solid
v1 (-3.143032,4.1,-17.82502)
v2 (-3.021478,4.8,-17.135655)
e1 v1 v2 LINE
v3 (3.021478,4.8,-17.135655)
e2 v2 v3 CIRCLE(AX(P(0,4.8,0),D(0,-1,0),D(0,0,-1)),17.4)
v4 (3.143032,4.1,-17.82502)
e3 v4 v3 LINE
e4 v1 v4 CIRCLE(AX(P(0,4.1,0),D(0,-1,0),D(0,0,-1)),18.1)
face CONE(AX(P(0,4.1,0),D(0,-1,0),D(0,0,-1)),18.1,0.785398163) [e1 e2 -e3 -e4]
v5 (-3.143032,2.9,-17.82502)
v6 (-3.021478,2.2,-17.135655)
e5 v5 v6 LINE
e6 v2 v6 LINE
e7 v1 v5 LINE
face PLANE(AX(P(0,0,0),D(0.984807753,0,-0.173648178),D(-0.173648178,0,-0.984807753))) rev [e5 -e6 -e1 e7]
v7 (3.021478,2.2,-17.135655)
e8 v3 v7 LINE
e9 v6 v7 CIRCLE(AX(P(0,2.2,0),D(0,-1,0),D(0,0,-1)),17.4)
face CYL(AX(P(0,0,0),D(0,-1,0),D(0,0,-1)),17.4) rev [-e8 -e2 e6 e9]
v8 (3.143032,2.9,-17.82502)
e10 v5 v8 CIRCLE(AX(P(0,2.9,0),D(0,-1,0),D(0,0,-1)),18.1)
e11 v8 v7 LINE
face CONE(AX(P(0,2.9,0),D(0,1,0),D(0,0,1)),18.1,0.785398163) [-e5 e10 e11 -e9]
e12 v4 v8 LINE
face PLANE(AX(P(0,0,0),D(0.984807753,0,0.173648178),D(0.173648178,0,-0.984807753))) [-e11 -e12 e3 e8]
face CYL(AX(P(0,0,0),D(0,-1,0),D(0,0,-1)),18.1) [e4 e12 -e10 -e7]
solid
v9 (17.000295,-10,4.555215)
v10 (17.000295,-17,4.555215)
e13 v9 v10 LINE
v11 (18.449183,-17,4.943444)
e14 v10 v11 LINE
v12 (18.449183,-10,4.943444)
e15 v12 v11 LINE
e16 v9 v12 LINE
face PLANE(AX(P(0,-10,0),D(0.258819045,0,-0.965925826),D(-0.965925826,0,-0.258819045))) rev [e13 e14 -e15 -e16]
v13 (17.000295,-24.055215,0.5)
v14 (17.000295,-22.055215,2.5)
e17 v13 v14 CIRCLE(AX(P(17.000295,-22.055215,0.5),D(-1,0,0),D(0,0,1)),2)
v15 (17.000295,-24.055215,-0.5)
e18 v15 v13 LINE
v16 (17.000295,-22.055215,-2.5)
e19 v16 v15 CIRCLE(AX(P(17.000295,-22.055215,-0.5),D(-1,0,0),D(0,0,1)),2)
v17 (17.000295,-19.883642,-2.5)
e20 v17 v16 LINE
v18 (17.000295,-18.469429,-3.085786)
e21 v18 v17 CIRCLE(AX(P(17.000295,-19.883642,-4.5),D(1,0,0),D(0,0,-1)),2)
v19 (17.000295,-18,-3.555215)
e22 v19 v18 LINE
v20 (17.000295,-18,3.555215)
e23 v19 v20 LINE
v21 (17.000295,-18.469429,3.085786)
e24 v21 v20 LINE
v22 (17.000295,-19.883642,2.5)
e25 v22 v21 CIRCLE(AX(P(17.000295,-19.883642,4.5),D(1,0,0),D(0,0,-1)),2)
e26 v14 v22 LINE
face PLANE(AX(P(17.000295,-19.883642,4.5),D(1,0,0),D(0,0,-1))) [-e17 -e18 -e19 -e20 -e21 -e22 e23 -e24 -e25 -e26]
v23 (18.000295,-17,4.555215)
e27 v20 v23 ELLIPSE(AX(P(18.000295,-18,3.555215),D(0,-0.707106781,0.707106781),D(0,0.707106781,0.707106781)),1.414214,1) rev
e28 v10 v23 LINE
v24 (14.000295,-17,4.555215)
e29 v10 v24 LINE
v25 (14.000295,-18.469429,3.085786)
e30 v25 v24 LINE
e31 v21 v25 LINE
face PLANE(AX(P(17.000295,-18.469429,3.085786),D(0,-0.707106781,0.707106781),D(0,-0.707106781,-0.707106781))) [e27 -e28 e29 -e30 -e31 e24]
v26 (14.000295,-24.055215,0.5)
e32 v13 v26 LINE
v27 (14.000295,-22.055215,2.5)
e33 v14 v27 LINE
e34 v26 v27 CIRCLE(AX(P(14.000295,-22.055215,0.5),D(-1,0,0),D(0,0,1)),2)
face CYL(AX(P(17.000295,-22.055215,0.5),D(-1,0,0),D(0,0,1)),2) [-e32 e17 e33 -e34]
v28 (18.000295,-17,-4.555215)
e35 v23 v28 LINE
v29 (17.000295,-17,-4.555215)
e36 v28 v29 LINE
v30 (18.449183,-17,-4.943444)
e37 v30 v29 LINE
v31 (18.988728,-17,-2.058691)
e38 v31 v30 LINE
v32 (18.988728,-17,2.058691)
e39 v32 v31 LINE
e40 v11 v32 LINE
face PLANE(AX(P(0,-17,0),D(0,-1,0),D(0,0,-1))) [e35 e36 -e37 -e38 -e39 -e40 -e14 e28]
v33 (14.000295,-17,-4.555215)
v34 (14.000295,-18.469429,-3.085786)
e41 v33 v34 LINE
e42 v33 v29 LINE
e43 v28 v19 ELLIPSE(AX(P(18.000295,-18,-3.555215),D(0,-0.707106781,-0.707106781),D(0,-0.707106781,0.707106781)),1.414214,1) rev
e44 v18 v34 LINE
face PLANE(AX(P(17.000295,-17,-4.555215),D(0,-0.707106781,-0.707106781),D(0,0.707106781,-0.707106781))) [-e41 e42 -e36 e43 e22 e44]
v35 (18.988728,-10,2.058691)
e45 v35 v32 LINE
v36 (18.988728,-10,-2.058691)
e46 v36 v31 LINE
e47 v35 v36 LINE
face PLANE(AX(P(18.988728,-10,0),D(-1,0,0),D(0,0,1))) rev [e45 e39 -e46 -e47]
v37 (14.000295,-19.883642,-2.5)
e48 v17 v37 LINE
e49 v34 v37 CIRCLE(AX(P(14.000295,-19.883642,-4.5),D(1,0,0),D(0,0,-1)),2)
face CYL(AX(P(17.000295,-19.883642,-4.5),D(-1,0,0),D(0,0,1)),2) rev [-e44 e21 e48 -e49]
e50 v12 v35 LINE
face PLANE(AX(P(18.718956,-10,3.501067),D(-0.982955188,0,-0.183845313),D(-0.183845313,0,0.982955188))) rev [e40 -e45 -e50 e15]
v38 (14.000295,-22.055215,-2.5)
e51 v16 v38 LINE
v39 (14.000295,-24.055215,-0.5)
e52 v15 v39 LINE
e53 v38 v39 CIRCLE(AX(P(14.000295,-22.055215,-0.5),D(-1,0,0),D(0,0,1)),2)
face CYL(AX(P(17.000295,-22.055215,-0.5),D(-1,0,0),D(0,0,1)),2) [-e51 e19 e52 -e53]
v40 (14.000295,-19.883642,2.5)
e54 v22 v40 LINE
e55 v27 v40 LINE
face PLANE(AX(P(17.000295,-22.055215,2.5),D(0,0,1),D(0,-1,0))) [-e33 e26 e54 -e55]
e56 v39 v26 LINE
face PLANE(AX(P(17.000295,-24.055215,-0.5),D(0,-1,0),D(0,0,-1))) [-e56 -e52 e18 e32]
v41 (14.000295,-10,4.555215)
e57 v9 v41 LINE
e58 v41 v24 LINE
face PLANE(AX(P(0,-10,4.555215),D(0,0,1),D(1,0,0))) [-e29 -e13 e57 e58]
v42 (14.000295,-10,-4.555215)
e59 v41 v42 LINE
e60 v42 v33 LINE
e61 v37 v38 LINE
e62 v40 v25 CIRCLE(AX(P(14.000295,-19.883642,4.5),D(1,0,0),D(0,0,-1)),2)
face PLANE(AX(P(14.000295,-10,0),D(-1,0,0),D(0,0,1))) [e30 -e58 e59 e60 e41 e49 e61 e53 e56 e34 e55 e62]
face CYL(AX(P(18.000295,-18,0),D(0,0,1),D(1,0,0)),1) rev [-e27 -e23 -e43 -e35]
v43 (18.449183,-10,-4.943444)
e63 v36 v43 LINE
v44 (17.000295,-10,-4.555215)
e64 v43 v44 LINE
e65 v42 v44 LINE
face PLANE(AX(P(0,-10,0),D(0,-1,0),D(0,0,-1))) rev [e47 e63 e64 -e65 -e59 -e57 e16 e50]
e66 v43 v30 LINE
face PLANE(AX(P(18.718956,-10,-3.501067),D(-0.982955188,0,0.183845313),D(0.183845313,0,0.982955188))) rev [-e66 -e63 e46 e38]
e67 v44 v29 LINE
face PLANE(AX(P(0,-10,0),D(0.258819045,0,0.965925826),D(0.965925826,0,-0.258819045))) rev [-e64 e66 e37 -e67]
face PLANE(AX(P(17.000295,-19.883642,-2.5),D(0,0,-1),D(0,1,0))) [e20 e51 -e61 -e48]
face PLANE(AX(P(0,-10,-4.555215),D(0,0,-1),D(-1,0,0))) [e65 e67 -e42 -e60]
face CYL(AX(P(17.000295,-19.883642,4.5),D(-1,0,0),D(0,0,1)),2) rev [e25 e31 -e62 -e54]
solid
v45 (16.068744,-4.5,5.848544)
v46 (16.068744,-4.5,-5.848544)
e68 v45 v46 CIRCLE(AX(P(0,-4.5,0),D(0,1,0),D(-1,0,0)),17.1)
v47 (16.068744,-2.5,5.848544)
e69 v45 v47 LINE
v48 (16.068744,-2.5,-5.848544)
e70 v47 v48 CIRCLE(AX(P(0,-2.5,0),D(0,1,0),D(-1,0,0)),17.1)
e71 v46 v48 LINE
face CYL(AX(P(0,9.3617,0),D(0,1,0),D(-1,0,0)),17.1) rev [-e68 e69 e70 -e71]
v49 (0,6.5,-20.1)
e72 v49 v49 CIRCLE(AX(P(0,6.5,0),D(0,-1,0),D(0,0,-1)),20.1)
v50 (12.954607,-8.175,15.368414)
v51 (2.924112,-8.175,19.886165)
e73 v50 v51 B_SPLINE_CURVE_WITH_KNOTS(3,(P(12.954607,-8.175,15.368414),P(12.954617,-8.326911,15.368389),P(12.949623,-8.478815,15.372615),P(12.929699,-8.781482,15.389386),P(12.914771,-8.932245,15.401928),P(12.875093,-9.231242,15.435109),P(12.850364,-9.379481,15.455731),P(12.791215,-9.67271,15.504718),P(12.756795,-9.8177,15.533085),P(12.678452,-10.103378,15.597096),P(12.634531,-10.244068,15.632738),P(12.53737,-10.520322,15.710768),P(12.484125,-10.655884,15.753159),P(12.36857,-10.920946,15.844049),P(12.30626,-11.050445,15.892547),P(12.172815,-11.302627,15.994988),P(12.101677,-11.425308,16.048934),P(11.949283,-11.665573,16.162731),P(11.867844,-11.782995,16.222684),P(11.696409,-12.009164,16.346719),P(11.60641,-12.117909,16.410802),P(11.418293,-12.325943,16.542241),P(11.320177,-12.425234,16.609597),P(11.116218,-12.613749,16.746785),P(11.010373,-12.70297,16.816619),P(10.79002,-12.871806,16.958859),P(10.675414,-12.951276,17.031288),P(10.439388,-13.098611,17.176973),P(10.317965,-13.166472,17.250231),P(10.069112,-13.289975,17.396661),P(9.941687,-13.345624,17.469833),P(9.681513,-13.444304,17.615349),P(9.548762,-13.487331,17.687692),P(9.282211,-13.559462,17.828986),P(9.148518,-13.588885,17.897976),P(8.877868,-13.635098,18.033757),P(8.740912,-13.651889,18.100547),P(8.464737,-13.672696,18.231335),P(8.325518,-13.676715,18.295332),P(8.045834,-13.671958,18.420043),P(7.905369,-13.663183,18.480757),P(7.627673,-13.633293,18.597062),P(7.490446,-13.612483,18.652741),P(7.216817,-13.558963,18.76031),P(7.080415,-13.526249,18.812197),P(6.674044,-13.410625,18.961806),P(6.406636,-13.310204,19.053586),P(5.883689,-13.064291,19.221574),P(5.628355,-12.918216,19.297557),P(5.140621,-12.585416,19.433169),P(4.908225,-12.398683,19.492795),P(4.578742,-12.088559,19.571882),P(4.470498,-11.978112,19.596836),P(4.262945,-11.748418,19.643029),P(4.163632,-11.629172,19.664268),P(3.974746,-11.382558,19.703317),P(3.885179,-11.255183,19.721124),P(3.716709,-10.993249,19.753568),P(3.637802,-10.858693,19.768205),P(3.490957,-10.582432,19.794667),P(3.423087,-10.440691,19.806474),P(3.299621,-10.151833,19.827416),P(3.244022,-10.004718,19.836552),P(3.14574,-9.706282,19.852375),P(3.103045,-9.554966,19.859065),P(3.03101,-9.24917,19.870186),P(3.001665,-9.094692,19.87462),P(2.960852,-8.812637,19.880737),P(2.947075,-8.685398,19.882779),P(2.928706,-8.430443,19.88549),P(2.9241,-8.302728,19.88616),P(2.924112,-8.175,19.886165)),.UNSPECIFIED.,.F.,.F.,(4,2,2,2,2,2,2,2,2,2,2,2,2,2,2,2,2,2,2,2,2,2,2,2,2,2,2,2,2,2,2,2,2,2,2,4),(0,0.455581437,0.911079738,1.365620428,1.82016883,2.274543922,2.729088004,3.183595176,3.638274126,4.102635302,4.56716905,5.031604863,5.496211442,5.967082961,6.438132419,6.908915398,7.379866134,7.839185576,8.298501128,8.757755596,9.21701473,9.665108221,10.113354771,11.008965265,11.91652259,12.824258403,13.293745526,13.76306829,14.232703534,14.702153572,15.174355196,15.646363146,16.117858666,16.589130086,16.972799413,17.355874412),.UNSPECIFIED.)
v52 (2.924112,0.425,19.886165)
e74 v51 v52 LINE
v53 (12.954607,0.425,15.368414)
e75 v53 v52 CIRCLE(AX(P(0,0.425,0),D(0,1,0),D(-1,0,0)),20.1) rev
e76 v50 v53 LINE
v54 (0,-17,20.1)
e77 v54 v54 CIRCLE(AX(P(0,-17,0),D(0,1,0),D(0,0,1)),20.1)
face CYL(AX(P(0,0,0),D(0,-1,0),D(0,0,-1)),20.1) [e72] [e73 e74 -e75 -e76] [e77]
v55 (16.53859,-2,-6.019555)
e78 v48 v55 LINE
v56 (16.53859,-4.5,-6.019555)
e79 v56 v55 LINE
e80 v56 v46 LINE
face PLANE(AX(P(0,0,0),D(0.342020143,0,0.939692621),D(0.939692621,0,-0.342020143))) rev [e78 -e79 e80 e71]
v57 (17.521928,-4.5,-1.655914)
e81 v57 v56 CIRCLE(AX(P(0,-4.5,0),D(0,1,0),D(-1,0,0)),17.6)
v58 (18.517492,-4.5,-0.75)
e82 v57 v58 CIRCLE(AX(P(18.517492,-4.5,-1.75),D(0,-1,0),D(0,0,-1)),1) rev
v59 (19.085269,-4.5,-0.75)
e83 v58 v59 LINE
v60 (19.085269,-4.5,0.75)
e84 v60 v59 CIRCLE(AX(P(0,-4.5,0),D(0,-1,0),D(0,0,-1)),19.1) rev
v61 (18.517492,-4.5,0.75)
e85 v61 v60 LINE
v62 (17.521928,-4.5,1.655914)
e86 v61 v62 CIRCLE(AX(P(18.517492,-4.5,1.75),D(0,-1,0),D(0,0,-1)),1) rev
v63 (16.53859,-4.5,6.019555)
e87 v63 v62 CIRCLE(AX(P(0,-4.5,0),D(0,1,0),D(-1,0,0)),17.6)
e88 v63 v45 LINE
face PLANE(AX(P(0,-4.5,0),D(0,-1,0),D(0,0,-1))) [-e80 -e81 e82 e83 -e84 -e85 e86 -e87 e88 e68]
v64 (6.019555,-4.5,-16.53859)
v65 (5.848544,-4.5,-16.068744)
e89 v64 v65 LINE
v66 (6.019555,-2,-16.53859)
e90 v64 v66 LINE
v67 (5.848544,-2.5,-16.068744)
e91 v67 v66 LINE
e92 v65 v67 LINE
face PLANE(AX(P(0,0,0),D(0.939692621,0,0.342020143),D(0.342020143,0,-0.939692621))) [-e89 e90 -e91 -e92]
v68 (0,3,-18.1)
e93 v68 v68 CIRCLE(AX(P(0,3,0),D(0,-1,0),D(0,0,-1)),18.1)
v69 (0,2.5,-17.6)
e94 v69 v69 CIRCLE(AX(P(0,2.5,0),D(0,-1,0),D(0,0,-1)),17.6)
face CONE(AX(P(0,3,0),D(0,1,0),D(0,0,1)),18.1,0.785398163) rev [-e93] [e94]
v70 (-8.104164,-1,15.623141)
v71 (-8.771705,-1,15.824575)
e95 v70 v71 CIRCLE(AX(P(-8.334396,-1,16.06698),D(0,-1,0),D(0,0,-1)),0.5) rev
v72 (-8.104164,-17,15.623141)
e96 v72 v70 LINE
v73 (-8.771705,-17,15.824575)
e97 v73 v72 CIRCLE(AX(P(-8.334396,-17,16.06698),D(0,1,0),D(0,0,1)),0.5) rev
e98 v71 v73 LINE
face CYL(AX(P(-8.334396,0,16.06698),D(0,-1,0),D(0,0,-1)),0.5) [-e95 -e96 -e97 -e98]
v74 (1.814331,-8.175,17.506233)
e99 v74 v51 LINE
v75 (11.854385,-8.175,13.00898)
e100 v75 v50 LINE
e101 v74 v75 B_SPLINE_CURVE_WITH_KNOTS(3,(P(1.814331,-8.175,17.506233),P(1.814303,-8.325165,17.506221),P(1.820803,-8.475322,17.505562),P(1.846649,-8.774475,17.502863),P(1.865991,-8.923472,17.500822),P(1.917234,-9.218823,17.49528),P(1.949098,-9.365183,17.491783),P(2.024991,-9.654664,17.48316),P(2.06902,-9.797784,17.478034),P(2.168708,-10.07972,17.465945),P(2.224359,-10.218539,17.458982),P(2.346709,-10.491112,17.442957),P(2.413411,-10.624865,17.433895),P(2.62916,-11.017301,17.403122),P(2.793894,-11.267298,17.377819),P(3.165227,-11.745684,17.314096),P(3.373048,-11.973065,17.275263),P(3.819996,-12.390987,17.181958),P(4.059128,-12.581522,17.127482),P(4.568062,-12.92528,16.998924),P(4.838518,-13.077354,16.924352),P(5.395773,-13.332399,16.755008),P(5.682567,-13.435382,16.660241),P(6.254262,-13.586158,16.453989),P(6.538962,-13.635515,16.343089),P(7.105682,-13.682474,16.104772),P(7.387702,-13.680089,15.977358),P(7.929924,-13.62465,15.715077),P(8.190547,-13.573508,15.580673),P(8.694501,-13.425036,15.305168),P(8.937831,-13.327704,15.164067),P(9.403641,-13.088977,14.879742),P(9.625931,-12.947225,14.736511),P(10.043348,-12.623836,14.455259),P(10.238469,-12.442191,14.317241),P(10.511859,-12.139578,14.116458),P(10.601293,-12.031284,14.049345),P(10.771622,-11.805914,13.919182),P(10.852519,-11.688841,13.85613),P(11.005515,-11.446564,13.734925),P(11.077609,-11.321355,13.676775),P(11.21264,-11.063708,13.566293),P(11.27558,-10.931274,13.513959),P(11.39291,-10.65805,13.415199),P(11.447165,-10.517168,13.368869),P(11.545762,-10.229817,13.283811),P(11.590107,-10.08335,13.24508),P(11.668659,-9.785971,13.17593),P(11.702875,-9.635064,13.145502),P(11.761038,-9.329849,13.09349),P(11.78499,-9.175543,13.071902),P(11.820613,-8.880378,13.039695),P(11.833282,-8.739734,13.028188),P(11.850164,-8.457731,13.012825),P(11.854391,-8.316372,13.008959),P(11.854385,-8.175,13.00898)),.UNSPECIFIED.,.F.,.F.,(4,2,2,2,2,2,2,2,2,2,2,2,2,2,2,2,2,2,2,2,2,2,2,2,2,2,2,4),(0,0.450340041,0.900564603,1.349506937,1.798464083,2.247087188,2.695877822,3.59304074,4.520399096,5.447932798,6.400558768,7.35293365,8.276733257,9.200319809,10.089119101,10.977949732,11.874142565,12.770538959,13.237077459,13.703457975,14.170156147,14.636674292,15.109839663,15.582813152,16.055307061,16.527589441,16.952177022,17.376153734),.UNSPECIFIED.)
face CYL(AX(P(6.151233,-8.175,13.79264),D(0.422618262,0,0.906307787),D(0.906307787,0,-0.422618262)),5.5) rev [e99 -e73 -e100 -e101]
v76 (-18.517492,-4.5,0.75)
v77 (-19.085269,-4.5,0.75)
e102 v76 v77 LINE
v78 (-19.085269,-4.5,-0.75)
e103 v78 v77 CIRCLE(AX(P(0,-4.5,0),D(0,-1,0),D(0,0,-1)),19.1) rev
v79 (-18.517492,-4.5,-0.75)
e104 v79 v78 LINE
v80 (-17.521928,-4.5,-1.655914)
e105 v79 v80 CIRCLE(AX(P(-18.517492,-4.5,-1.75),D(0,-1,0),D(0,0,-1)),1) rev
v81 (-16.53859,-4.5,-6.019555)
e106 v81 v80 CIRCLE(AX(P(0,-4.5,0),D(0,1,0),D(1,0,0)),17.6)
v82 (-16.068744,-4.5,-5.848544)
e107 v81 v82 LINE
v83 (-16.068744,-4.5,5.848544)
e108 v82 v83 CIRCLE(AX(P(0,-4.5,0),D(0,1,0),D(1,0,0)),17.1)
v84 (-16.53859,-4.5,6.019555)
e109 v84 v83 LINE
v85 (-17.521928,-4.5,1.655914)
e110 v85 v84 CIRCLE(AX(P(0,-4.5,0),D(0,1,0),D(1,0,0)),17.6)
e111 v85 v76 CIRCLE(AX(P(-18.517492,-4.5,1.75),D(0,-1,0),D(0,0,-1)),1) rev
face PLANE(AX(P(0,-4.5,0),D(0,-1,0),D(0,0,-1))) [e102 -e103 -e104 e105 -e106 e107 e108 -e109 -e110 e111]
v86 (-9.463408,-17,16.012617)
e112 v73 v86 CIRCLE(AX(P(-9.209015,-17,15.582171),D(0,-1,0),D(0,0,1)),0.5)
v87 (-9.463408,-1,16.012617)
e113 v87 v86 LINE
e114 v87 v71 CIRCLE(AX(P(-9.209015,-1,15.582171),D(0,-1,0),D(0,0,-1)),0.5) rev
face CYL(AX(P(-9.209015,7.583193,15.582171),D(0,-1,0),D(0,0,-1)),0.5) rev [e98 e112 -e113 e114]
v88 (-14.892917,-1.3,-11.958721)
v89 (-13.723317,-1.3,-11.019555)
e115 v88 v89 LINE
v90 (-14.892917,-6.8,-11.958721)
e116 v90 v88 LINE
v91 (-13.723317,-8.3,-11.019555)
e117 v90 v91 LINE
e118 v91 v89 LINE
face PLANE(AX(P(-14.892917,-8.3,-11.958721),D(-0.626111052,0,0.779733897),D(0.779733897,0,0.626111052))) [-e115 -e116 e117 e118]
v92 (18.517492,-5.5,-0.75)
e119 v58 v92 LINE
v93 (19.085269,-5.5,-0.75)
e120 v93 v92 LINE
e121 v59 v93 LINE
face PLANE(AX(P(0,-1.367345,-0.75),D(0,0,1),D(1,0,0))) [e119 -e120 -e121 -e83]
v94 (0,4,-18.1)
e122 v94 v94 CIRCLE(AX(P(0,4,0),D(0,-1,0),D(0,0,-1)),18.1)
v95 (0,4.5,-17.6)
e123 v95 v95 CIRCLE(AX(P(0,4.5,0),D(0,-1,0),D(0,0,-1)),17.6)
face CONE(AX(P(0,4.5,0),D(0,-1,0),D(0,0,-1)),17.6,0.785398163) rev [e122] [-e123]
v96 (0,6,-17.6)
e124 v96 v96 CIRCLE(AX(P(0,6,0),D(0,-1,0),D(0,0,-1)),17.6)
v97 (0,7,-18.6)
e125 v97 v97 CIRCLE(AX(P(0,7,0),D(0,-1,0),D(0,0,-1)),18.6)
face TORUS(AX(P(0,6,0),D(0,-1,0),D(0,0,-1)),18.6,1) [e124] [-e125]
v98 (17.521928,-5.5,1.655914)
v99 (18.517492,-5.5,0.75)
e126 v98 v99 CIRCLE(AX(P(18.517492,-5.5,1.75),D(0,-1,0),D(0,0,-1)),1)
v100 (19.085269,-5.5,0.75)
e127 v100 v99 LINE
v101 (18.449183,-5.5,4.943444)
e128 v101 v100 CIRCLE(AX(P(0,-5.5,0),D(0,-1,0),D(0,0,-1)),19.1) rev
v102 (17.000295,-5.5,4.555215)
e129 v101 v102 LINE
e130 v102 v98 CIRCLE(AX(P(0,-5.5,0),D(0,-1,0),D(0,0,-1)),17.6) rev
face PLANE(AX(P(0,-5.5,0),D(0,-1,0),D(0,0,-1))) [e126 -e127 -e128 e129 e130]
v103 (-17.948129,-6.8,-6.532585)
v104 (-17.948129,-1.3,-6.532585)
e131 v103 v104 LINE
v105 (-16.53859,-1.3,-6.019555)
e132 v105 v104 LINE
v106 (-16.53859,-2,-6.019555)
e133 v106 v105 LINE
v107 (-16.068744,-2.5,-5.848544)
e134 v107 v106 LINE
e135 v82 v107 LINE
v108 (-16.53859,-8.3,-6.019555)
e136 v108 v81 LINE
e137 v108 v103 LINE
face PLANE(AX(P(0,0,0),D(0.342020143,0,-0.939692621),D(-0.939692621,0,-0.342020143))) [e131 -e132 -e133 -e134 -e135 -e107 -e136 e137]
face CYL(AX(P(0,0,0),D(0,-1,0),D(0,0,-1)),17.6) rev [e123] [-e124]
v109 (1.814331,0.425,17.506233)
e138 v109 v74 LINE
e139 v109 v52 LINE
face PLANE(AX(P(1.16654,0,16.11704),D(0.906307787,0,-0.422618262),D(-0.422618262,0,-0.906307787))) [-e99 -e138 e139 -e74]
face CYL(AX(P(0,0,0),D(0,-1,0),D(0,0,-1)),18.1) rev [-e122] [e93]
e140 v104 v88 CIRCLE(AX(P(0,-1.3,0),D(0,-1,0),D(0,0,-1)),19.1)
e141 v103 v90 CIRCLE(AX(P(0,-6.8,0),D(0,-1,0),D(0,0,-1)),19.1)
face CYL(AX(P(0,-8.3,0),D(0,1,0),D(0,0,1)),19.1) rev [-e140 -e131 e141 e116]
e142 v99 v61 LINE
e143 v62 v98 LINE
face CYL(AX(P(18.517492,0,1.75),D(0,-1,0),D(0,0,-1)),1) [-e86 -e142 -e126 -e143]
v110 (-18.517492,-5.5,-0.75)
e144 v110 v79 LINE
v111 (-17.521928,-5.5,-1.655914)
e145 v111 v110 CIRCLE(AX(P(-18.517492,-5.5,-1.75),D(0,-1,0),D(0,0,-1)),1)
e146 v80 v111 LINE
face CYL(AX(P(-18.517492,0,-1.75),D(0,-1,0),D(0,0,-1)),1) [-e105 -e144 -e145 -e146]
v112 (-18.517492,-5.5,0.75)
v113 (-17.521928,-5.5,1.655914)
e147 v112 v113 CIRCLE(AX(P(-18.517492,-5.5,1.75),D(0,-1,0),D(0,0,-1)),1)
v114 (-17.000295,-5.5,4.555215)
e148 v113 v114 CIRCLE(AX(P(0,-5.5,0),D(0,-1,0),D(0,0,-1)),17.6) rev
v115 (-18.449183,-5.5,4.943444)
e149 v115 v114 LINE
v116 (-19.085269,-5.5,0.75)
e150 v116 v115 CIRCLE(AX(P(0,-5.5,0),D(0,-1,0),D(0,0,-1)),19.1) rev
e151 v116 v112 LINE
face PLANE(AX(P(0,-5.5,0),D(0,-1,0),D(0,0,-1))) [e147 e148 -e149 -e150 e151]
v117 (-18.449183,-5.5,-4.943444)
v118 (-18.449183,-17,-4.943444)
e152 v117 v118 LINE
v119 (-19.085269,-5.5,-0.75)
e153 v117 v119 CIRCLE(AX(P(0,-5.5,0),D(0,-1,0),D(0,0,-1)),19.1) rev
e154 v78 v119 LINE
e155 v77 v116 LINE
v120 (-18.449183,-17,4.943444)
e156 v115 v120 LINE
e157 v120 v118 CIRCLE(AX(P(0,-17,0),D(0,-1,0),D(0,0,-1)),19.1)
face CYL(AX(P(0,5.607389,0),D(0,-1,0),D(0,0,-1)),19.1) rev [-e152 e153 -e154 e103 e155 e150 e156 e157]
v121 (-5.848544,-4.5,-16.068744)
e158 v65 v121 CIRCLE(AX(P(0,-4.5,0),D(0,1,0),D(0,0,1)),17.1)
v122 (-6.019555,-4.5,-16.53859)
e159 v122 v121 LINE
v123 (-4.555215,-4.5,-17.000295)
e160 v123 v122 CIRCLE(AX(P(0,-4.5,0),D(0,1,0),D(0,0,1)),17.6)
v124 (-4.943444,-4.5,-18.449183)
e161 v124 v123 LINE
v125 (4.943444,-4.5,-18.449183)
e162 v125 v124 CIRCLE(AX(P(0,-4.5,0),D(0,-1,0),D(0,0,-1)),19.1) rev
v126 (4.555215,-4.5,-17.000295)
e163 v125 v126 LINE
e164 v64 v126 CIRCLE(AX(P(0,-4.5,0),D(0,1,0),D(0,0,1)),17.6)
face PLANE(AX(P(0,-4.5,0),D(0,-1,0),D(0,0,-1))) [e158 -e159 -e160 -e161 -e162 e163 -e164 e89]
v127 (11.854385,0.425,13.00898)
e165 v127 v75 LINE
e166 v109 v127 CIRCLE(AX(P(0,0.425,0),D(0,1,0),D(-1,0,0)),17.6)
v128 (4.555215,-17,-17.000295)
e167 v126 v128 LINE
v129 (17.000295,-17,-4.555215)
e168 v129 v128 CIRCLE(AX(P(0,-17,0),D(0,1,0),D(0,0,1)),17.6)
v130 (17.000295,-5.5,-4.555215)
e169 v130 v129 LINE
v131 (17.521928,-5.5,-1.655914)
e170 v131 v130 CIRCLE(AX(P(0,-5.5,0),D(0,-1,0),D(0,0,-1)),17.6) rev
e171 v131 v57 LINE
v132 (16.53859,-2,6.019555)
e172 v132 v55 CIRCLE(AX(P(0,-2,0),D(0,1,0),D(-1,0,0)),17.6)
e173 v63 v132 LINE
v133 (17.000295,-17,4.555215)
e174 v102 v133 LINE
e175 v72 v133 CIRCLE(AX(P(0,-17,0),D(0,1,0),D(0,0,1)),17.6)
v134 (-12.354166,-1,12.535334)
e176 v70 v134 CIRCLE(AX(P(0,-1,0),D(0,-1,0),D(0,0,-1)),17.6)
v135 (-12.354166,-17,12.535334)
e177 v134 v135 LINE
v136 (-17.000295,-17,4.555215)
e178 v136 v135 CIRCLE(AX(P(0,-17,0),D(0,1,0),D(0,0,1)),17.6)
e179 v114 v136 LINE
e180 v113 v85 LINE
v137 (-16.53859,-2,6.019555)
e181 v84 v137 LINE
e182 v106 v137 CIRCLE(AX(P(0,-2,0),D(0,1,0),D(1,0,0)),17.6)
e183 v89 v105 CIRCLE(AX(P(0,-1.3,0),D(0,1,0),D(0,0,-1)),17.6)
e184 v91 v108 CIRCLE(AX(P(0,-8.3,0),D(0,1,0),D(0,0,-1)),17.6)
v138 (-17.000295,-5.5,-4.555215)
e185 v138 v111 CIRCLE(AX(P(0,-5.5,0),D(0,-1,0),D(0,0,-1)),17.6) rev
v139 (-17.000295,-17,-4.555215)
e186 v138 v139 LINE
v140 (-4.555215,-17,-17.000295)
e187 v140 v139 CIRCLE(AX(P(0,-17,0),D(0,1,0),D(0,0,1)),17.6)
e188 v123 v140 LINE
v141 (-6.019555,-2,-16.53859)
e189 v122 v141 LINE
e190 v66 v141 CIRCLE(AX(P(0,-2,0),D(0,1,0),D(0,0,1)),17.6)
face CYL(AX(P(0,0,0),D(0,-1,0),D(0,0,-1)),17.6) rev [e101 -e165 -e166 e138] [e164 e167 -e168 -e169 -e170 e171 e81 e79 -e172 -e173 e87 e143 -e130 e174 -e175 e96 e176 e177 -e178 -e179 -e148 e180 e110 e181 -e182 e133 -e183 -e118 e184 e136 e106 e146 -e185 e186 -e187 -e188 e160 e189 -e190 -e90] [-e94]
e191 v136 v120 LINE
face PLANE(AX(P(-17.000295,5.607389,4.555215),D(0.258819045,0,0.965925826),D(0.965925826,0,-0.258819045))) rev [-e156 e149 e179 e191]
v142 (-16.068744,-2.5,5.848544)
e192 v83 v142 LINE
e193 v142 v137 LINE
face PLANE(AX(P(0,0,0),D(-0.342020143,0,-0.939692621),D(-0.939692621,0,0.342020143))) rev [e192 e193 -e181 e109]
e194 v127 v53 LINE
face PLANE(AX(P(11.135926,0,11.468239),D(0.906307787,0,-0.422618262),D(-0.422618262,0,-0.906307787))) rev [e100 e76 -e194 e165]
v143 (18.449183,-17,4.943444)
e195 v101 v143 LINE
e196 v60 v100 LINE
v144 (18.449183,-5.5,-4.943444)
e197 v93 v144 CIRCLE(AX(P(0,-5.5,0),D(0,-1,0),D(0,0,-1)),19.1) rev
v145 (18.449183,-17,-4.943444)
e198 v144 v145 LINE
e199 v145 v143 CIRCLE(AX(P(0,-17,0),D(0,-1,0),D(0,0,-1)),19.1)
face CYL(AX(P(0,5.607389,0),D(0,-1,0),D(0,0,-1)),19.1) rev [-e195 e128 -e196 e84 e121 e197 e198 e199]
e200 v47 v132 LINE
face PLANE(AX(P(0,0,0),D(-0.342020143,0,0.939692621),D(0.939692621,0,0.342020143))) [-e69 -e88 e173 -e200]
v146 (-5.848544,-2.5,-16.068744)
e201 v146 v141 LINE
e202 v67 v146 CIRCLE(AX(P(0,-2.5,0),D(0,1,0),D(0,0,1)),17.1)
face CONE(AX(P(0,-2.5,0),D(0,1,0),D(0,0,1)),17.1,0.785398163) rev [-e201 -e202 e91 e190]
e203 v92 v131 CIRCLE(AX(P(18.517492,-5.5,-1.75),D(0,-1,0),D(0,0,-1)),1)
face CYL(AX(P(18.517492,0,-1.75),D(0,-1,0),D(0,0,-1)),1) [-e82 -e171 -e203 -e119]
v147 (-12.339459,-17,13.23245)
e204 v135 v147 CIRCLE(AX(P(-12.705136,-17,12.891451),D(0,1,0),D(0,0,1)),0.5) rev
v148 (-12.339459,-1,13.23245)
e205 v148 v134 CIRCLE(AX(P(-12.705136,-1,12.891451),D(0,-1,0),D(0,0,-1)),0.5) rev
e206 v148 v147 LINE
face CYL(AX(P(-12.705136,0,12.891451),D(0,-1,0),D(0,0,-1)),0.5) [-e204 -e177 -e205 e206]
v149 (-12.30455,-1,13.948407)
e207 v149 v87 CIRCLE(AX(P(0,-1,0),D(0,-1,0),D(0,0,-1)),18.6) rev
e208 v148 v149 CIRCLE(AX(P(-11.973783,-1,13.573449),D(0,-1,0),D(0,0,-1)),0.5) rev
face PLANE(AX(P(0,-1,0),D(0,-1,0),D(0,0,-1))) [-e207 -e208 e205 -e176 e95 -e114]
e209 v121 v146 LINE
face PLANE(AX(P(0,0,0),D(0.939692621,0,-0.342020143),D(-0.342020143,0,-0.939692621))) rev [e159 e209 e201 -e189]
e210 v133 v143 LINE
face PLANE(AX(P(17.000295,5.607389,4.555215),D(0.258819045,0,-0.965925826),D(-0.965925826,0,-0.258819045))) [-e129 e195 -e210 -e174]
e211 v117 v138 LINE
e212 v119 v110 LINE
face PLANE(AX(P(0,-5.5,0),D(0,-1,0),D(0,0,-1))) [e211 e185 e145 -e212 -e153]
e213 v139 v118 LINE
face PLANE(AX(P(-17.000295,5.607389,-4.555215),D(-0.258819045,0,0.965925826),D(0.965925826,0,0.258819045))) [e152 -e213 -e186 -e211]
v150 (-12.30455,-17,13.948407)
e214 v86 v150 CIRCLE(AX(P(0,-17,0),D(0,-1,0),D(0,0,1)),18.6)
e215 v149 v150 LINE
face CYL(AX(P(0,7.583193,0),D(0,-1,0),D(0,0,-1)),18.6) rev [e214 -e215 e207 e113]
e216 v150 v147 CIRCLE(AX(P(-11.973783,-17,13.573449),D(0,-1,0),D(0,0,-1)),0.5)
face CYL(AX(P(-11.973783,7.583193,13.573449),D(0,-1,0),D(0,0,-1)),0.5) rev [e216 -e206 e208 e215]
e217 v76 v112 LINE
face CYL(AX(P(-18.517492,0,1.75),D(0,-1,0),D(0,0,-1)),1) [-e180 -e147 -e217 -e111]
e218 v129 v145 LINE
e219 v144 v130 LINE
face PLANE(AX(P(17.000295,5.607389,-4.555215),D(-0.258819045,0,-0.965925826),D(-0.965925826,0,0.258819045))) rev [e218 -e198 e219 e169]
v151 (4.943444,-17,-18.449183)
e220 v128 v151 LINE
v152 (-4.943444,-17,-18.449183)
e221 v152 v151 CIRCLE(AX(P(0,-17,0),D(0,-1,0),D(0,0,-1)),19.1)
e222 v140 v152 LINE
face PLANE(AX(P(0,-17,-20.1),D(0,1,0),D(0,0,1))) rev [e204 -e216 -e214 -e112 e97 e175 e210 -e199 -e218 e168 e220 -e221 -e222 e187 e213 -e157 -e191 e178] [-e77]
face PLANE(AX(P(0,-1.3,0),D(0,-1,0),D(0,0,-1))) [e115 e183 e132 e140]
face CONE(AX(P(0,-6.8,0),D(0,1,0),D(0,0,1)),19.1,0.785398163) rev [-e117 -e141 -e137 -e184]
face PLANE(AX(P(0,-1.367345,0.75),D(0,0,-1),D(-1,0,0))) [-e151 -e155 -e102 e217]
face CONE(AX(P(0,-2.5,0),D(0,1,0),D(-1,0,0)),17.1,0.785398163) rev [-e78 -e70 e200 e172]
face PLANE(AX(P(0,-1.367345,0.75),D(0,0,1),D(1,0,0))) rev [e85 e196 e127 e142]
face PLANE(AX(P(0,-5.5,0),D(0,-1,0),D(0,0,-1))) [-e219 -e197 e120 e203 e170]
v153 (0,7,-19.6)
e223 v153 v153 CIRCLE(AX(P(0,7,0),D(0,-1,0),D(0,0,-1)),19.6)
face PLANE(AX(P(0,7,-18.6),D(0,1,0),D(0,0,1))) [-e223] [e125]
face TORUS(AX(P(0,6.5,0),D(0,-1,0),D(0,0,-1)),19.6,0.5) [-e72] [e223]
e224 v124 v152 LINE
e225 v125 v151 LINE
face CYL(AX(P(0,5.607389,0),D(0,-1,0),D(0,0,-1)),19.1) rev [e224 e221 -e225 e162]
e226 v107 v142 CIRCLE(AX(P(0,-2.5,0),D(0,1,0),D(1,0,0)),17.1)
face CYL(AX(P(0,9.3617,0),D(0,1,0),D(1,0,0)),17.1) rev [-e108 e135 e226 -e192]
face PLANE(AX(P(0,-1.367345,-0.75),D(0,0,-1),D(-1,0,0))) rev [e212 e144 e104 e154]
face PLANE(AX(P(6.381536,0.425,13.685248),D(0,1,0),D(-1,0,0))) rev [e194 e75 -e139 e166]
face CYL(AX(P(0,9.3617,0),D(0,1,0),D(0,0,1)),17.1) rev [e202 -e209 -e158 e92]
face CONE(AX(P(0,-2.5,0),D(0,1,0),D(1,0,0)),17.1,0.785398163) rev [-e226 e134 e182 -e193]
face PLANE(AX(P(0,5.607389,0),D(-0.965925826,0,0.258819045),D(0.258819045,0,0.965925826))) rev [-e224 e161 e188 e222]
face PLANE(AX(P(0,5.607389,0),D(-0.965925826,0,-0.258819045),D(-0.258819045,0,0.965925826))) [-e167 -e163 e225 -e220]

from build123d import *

# Parameters (mm, degrees)
REVOLVE4_ANGLE           = 10
REVOLVE4_OTHER_WAY_ANGLE = 10
SKETCH7_W                = 2.5
SKETCH7_H                = 17
REVOLVE6_ANGLE           = 40
CUT_EXTRUDE2_START       = -16
CUT_EXTRUDE2_DEPTH       = 16
FILLET1_R                = 0.5
CUT_EXTRUDE3_START       = -12.5
CUT_EXTRUDE3_DEPTH       = 12.5
CUT_EXTRUDE4_START       = -11.5
CUT_EXTRUDE4_DEPTH       = 11.5
CUT_EXTRUDE5_START       = -12.5
CUT_EXTRUDE5_DEPTH       = 12.5
FILLET2_R                = 1
SKETCH13_W               = 11
SKETCH13_H               = 8.6
CUT_EXTRUDE6_DEPTH       = 5
CIRPATTERN1_COUNT        = 4
BOSS_EXTRUDE1_DEPTH      = 7
BOSS_EXTRUDE2_DEPTH      = 3
FILLET3_R                = 1
CUT_EXTRUDE7_DEPTH       = 2
CUT_EXTRUDE7_DEPTH_BACK  = 5
CHAMFER1_SIZE            = 1.5


# Read off the part's stored shape, not the designer's step: Revolve6
# Some blends are built 0.0001 mm under size
with BuildPart() as part:
    # Sketch1 → Revolve3 (revolve)
    with BuildSketch(Plane(origin=(0, 0, 0), x_dir=(0, 0, -1), z_dir=(1, 0, 0))):
        with BuildLine():
            Line((17.6, 0), (17.6, 2.5))
            Line((17.6, 2.5), (18.1, 3))
            Line((18.1, 3), (18.1, 4))
            Line((18.1, 4), (17.6, 4.5))
            Line((17.6, 4.5), (17.6, 6))
            ThreePointArc((17.6, 6), (17.892893219, 6.707106781), (18.6, 7))
            Line((18.6, 7), (19.6, 7))
            ThreePointArc((19.6, 7), (19.953553391, 6.853553391), (20.1, 6.5))
            Line((20.1, 6.5), (20.1, 0))
            Line((20.1, 0), (17.6, 0))
        make_face()
    revolve(axis=Axis((0, 0, 0), (0, 1, 0)))

    # Sketch7 → Revolve5 (revolve)
    with BuildSketch(Plane(origin=(0, 0, 0), x_dir=(0, 0, -1), z_dir=(1, 0, 0))):
        with Locations((18.85, -8.5)):
            Rectangle(SKETCH7_W, SKETCH7_H)
    revolve(axis=Axis((0, 9.361699771, 0), (0, -1, 0)))

    # Revolve6 outline → Revolve6 (revolve)
    with BuildSketch(Plane(origin=(0, 0, 0), x_dir=(0.3420201433256701, 0, -0.9396926207859079), z_dir=(0.9396926207859079, 0, 0.3420201433256701))):
        Polygon((17.1, -2.5), (17.1, -4.5), (17.6, -4.5), (17.6, -2), align=None)
    revolve6 = revolve(axis=Axis((0, 0, 0), (0, 1, 0)), revolution_arc=REVOLVE6_ANGLE)

    # Sketch11 → Cut-Extrude2 (cut)
    with BuildSketch(Plane.XZ.offset(17).offset(CUT_EXTRUDE2_START)):
        with BuildLine():
            Line((-8.771705355, 15.824575355), (-8.532649316, 15.393306846))
            ThreePointArc((-8.532649316, 15.393306846), (-10.34502044, 14.238699101), (-12.003171137, 12.871825148))
            Line((-12.003171137, 12.871825148), (-12.339459485, 13.23245025))
            ThreePointArc((-12.339459485, 13.23245025), (-12.47318933, 13.597800043), (-12.30455011, 13.948406597))
            ThreePointArc((-12.30455011, 13.948406597), (-10.932805693, 15.047716095), (-9.463407894, 16.012617245))
            ThreePointArc((-9.463407894, 16.012617245), (-9.077848861, 16.06465929), (-8.771705355, 15.824575355))
        make_face()
    extrude(amount=CUT_EXTRUDE2_DEPTH, mode=Mode.SUBTRACT)

    # Fillet1
    fillet1_edges = [part.edges().sort_by_distance(p)[0] for p in [
        (-12.003171137, -9, 12.871825148),
        (-8.532649316, -9, 15.393306846),
    ]]
    fillet(fillet1_edges, radius=FILLET1_R - 0.0001)  # a hair under: the kernel refuses the full size

    # Sketch8 → Cut-Extrude3 (cut)
    with BuildSketch(Plane(origin=(0, -17, 0), x_dir=(-1, 0, 0), z_dir=(0, -1, 0)).offset(CUT_EXTRUDE3_START)):
        with BuildLine():
            ThreePointArc((4.555215194, 17.000294543), (0, 17.6), (-4.555215194, 17.000294543))
            Line((-4.555215194, 17.000294543), (-4.943443761, 18.449183282))
            ThreePointArc((-4.943443761, 18.449183282), (0, 19.1), (4.943443761, 18.449183282))
            Line((4.943443761, 18.449183282), (4.555215194, 17.000294543))
        make_face()
    extrude(amount=CUT_EXTRUDE3_DEPTH, mode=Mode.SUBTRACT)

    # Sketch8<3> → Cut-Extrude4 (cut)
    with BuildSketch(Plane(origin=(0, -17, 0), x_dir=(-1, 0, 0), z_dir=(0, -1, 0)).offset(CUT_EXTRUDE4_START)):
        with BuildLine():
            Line((17.000294543, 4.555215194), (18.449183282, 4.943443761))
            ThreePointArc((18.449183282, 4.943443761), (19.1, 0), (18.449183282, -4.943443761))
            Line((18.449183282, -4.943443761), (17.000294543, -4.555215194))
            ThreePointArc((17.000294543, -4.555215194), (17.6, 0), (17.000294543, 4.555215194))
        make_face()
        with BuildLine():
            Line((-17.000294543, -4.555215194), (-18.449183282, -4.943443761))
            ThreePointArc((-18.449183282, -4.943443761), (-19.1, 0), (-18.449183282, 4.943443761))
            Line((-18.449183282, 4.943443761), (-17.000294543, 4.555215194))
            ThreePointArc((-17.000294543, 4.555215194), (-17.6, 0), (-17.000294543, -4.555215194))
        make_face()
    extrude(amount=CUT_EXTRUDE4_DEPTH, mode=Mode.SUBTRACT)

    # Sketch8<4> → Cut-Extrude5 (cut)
    with BuildSketch(Plane(origin=(0, -17, 0), x_dir=(-1, 0, 0), z_dir=(0, -1, 0)).offset(CUT_EXTRUDE5_START)):
        with BuildLine():
            Line((-19.085269189, -0.75), (-17.584012625, -0.75))
            ThreePointArc((-17.584012625, -0.75), (-17.6, 0), (-17.584012625, 0.75))
            Line((-17.584012625, 0.75), (-19.085269189, 0.75))
            ThreePointArc((-19.085269189, 0.75), (-19.1, 0), (-19.085269189, -0.75))
        make_face()
        with BuildLine():
            Line((19.085269189, 0.75), (17.584012625, 0.75))
            ThreePointArc((17.584012625, 0.75), (17.6, 0), (17.584012625, -0.75))
            Line((17.584012625, -0.75), (19.085269189, -0.75))
            ThreePointArc((19.085269189, -0.75), (19.1, 0), (19.085269189, 0.75))
        make_face()
    extrude(amount=CUT_EXTRUDE5_DEPTH, mode=Mode.SUBTRACT)

    # Fillet2
    fillet2_edges = [part.edges().sort_by_distance(p)[0] for p in [
        (17.584012625, -5, 0.75),
        (17.584012625, -5, -0.75),
        (-17.584012625, -5, -0.75),
        (-17.584012625, -5, 0.75),
    ]]
    fillet(fillet2_edges, radius=FILLET2_R)

    # Sketch13 → Cut-Extrude6 (cut)
    with BuildSketch(Plane(origin=(8.494627061, 0, 18.216786519), x_dir=(0.9063077870366499, 0, -0.42261826174069955), z_dir=(0.42261826174069955, 0, 0.9063077870366499))):
        with BuildLine():
            ThreePointArc((5.245888847, -8.175), (-0.254111153, -13.675), (-5.754111153, -8.175))
            Line((-5.754111153, -8.175), (5.245888847, -8.175))
        make_face()
        with Locations((-0.254111153, -3.875)):
            Rectangle(SKETCH13_W, SKETCH13_H)
    extrude(amount=-CUT_EXTRUDE6_DEPTH, mode=Mode.SUBTRACT)

    # CirPattern1: Revolve6 ×4 about axis, 1 skipped
    cirpattern1_axis = Axis((0, 7, 0), (0, -1, 0))
    add([revolve6.rotate(cirpattern1_axis, i * 360 / CIRPATTERN1_COUNT) for i in range(1, CIRPATTERN1_COUNT) if i not in (2,)])

    # Sketch17 → Cut-Extrude7 (cut, two sides: drawn at the far end of the back side and taken through both)
    with BuildSketch(Plane(origin=(0, -6.3, 0), x_dir=(-1, 0, 0), z_dir=(0, -1, 0)).offset(-CUT_EXTRUDE7_DEPTH_BACK)):
        with BuildLine():
            Line((17.948129057, 6.532584738), (16.538590126, 6.019554523))
            ThreePointArc((16.538590126, 6.019554523), (15.336093031, 8.635059382), (13.723316586, 11.019554523))
            Line((13.723316586, 11.019554523), (14.892917432, 11.958721101))
            ThreePointArc((14.892917432, 11.958721101), (16.643146415, 9.371001943), (17.948129057, 6.532584738))
        make_face()
    extrude(amount=CUT_EXTRUDE7_DEPTH + CUT_EXTRUDE7_DEPTH_BACK, mode=Mode.SUBTRACT)

    # Chamfer1
    chamfer1_edges = [part.edges().sort_by_distance(p)[0] for p in [
        (-16.643146415, -8.3, -9.371001943),
    ]]
    chamfer(chamfer1_edges, length=CHAMFER1_SIZE - 0.0001)  # a hair under: the kernel refuses the full size


with BuildPart() as body_2:
    # Sketch6 → Revolve4 (revolve)
    with BuildSketch(Plane(origin=(0, 0, 0), x_dir=(0, 0, -1), z_dir=(1, 0, 0))):
        Polygon((18.1, 4.1), (17.4, 4.8), (17.4, 2.2), (18.1, 2.9), (18.1, 3), (18.1, 4), align=None)
    revolve(axis=Axis((0, 0, 0), (0, 1, 0)), revolution_arc=REVOLVE4_ANGLE)

    # Sketch6 → Revolve4 other way (revolve)
    with BuildSketch(Plane(origin=(0, 0, 0), x_dir=(0, 0, -1), z_dir=(1, 0, 0))):
        Polygon((18.1, 4.1), (17.4, 4.8), (17.4, 2.2), (18.1, 2.9), (18.1, 3), (18.1, 4), align=None)
    revolve(axis=Axis((0, 0, 0), (0, -1, 0)), revolution_arc=REVOLVE4_OTHER_WAY_ANGLE)


with BuildPart() as body_3:
    # Sketch14 → Boss-Extrude1 (new body)
    with BuildSketch(Plane.XZ.offset(17)):
        Polygon((14.000294543, -4.555215194), (17.000294543, -4.555215194), (18.449183282, -4.943443761), (18.988728028, -2.05869082), (18.988728028, 2.05869082), (18.449183282, 4.943443761), (17.000294543, 4.555215194), (14.000294543, 4.555215194), align=None)
    extrude(amount=-BOSS_EXTRUDE1_DEPTH)

    # Sketch15 → Boss-Extrude2 (add)
    with BuildSketch(Plane.ZY.offset(-14.000294543)):
        with BuildLine():
            Line((-4.555215194, -17), (-3.085786438, -18.469428756))
            ThreePointArc((-3.085786438, -18.469428756), (-2.652240935, -19.118275454), (-2.5, -19.883642319))
            Line((-2.5, -19.883642319), (-2.5, -22.055215194))
            ThreePointArc((-2.5, -22.055215194), (-1.914213562, -23.469428756), (-0.5, -24.055215194))
            Line((-0.5, -24.055215194), (0.5, -24.055215194))
            ThreePointArc((0.5, -24.055215194), (1.914213562, -23.469428756), (2.5, -22.055215194))
            Line((2.5, -22.055215194), (2.5, -19.883642319))
            ThreePointArc((2.5, -19.883642319), (2.652240935, -19.118275454), (3.085786438, -18.469428756))
            Line((3.085786438, -18.469428756), (4.555215194, -17))
            Line((4.555215194, -17), (-4.555215194, -17))
        make_face()
    extrude(amount=-BOSS_EXTRUDE2_DEPTH)

    # Fillet3
    # the kernel refuses this fillet: 1 mm, written as the material it adds along each edge
    with BuildSketch(Plane(origin=(17.000294543, -17, 7.055215194), x_dir=(1, 0, 0), z_dir=(0, 0, -1))) as fillet3_piece_1_section:
        with BuildLine():
            CenterArc((FILLET3_R, FILLET3_R), FILLET3_R, 180, 90)
            Line((0, FILLET3_R), (0, 0))
            Line((0, 0), (FILLET3_R, 0))
        make_face()
    fillet3_piece_1 = extrude(amount=14.110430388, mode=Mode.PRIVATE)
    fillet3_piece_1 = split(fillet3_piece_1, bisect_by=Plane(origin=(17.233034532, -19.385437928, -2.169777266), z_dir=(0, 0.7071067811865458, 0.7071067811865492)), keep=Keep.TOP, mode=Mode.PRIVATE)
    fillet3_piece_1 = split(fillet3_piece_1, bisect_by=Plane(origin=(17.233034532, -19.385437928, 2.169777266), z_dir=(0, 0.7071067811865461, -0.7071067811865489)), keep=Keep.TOP, mode=Mode.PRIVATE)
    add(fillet3_piece_1)


solid = Compound([part.part, body_2.part, body_3.part])
